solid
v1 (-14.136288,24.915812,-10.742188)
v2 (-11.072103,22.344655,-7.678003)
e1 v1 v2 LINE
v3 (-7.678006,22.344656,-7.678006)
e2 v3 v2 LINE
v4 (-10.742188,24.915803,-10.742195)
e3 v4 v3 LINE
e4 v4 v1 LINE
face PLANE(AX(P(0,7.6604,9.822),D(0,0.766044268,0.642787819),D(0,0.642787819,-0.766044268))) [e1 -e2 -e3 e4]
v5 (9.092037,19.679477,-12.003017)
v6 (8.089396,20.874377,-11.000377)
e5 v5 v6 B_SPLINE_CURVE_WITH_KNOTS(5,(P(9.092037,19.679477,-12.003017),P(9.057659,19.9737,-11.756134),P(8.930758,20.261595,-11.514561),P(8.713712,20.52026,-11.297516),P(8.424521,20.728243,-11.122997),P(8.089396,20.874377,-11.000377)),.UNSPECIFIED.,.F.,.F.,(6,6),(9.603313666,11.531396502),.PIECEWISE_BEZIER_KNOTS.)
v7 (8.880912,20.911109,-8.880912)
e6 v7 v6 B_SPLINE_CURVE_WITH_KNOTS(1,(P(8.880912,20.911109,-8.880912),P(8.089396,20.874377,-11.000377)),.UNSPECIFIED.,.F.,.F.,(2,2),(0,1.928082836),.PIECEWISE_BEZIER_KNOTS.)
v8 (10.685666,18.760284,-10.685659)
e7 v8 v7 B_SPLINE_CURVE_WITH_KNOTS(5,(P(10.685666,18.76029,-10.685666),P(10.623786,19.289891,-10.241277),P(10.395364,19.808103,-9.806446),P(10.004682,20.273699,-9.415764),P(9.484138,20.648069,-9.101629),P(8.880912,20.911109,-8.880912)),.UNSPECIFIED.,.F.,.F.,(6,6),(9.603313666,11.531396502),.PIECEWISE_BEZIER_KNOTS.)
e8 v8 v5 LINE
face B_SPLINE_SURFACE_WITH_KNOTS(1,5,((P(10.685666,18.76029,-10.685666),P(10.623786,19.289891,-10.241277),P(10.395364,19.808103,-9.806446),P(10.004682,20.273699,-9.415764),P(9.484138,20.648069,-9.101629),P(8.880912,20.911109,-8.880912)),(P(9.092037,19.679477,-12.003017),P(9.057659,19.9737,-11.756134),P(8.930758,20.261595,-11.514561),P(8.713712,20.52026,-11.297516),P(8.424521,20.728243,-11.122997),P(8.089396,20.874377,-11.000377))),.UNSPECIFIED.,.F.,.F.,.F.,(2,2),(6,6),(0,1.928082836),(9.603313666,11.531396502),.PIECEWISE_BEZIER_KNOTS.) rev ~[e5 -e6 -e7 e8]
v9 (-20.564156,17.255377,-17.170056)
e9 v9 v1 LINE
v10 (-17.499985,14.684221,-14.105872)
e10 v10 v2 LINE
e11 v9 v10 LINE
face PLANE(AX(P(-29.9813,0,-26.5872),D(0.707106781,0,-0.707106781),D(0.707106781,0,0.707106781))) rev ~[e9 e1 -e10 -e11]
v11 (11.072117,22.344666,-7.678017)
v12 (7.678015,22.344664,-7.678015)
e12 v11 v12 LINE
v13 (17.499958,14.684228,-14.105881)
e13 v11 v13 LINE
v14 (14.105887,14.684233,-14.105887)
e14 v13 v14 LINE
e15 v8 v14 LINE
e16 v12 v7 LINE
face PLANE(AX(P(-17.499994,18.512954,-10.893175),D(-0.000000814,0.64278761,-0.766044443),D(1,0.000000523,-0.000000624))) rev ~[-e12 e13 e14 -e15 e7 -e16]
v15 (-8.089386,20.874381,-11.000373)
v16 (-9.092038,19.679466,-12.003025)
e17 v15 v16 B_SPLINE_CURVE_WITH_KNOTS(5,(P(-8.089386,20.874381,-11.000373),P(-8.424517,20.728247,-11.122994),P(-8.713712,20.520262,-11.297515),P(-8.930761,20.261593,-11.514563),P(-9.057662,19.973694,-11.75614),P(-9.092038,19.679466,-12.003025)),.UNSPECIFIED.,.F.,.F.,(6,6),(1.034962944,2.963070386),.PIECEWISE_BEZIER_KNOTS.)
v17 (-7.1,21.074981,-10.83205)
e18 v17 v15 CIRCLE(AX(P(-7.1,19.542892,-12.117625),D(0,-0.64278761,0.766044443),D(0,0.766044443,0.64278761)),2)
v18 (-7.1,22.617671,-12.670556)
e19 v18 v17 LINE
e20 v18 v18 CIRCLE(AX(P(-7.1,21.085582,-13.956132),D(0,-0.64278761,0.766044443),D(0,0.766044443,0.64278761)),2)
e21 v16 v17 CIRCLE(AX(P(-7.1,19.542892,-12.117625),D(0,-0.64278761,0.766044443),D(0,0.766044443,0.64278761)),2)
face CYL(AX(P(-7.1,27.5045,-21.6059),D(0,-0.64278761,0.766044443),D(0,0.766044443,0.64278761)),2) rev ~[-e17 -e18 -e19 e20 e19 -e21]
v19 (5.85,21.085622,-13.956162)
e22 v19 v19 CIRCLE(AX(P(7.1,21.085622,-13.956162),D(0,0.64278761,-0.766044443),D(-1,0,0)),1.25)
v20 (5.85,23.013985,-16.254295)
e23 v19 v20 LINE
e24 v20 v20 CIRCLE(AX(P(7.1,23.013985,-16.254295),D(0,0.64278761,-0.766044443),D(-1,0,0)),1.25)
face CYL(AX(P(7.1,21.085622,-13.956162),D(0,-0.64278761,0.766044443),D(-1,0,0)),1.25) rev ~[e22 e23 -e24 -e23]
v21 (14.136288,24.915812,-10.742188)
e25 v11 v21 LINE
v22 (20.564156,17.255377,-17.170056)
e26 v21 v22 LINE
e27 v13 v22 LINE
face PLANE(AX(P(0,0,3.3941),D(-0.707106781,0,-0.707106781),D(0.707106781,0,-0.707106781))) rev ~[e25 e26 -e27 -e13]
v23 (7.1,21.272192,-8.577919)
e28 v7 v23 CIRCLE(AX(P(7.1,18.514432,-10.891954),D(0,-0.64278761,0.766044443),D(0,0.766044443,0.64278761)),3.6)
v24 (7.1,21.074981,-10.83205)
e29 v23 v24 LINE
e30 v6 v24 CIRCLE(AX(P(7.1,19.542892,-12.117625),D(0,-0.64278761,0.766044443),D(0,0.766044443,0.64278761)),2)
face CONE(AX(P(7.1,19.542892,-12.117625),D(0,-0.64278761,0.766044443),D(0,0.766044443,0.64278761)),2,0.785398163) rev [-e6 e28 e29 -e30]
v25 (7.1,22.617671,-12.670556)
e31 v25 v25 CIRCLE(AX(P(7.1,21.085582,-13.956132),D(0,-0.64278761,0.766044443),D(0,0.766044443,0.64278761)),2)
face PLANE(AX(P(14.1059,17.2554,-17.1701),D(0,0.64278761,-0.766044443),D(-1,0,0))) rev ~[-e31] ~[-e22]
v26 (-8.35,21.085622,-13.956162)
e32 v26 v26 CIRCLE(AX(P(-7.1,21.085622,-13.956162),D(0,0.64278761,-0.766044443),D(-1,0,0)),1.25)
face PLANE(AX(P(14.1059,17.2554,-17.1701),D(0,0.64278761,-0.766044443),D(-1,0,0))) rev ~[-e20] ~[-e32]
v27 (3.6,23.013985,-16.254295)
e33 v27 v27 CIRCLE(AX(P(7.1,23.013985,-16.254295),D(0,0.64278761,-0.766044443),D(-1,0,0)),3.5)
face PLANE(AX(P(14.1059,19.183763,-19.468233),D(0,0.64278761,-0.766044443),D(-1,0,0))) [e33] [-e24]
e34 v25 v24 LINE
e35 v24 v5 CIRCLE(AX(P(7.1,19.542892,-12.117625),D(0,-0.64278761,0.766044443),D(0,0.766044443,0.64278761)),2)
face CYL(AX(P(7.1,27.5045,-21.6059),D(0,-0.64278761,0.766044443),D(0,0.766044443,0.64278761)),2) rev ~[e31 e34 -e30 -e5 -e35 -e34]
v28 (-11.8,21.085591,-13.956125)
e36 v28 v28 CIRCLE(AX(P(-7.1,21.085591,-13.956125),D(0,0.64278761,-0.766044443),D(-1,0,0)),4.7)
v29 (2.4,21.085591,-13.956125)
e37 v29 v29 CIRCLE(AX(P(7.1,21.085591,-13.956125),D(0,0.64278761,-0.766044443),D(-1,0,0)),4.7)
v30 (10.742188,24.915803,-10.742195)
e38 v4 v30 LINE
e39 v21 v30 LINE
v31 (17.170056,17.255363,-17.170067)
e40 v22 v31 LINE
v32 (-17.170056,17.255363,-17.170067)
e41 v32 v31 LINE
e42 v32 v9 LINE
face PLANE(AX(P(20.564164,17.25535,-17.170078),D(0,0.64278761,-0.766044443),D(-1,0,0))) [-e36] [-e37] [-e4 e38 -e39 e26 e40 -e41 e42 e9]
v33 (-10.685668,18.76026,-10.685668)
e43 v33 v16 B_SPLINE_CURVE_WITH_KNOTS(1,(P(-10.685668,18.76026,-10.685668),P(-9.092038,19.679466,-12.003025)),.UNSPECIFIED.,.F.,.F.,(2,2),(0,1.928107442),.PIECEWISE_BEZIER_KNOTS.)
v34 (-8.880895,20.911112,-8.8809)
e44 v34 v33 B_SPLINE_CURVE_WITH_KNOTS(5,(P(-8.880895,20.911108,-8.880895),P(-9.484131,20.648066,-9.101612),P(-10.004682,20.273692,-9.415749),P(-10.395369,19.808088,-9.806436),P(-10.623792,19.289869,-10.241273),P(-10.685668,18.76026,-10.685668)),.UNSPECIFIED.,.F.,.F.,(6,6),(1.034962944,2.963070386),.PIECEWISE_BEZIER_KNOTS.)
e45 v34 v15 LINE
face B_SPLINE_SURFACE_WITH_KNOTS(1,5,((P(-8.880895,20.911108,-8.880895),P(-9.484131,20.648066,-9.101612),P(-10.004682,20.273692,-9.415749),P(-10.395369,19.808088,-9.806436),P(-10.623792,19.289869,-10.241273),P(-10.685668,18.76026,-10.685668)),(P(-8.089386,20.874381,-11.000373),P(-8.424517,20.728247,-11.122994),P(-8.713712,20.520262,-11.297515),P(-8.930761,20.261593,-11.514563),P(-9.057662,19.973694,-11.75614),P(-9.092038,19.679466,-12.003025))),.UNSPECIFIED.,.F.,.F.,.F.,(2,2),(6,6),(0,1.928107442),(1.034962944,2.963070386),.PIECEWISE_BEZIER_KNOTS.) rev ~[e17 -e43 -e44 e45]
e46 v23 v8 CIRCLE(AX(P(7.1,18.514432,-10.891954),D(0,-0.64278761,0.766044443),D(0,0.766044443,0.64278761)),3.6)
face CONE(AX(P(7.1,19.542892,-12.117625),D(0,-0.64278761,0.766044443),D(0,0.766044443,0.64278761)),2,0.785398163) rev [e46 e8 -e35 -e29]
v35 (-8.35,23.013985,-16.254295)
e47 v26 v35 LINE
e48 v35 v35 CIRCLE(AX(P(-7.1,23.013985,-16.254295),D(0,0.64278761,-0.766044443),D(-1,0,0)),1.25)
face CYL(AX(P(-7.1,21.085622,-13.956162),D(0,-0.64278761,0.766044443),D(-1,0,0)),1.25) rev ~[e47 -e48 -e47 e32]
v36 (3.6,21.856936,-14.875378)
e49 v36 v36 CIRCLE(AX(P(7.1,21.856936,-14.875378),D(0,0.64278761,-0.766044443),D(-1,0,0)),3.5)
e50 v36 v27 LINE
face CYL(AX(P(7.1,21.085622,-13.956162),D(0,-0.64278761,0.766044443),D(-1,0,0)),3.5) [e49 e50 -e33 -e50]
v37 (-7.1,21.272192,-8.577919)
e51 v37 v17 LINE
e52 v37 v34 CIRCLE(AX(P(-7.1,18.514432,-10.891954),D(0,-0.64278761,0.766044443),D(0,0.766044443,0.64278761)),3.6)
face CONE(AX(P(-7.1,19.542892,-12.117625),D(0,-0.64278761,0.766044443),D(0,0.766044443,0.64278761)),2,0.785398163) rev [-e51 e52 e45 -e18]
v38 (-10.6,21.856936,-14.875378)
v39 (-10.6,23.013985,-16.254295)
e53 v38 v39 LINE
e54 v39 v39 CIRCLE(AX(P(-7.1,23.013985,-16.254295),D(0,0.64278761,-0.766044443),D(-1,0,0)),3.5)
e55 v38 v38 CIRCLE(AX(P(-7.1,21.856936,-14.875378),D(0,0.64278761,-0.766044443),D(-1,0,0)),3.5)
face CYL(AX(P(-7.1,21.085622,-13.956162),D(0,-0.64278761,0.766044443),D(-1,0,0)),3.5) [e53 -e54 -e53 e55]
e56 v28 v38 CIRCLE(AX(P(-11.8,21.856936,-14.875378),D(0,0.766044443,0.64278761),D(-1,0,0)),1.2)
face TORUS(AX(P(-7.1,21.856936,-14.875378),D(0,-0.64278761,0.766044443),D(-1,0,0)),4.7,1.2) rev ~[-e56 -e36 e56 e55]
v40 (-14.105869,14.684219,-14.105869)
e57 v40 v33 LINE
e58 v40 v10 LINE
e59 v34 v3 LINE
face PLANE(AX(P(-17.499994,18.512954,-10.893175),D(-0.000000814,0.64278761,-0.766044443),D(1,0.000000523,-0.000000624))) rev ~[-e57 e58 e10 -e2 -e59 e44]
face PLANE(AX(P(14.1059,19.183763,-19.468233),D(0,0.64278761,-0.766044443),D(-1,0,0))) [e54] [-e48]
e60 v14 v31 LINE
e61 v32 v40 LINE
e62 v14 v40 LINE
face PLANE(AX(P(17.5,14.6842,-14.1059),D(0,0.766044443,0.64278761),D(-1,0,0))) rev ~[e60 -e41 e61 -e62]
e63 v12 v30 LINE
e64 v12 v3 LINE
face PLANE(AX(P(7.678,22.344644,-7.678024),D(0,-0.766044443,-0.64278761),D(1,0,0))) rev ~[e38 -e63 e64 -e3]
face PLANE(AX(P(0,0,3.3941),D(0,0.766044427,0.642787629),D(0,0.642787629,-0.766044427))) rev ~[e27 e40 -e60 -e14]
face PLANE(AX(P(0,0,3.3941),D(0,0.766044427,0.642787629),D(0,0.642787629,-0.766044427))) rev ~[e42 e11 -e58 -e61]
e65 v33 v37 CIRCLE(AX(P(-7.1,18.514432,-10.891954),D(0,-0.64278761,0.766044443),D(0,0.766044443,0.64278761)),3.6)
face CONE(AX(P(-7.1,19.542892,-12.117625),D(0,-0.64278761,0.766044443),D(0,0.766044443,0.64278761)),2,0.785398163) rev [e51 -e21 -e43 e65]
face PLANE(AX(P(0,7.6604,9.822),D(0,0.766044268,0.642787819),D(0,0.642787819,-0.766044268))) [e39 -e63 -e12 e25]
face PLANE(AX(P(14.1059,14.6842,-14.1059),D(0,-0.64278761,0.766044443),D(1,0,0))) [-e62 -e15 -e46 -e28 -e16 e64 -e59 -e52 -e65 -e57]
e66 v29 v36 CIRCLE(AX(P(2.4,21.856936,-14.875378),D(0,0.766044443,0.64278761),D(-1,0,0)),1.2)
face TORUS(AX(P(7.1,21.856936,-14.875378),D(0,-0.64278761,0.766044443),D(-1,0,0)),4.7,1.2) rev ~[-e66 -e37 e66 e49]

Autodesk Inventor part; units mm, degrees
ref_plane "YZ Plane" through (0, 0, 0) normal (1, 0, 0) x (0, 1, 0)
ref_plane "XZ Plane" through (0, 0, 0) normal (0, 1, 0) x (-1, 0, 0)
sketch "スケッチ1" plane through (0, 0, 0) normal (0, 1, 0) x (-1, 0, 0)
  line L0 (28.2843, -28.2843) -> (0, 0)
  line L1 (0, 0) -> (-28.2843, -28.2843)
  line L2 (29.9813, -26.5872) -> (0, 3.3941)
  line L3 (0, 3.3941) -> (-29.9813, -26.5872)
  line L4 (28.2843, -28.2843) -> (29.9813, -26.5872)
  line L5 (-28.2843, -28.2843) -> (-29.9813, -26.5872)
  dimension "d0" = 40
  dimension "d1" = 2.4
extrude "押し出し1" add sketch "スケッチ1" along normal blind 50
sketch "スケッチ2" plane through (0, 0, 0) normal (1, 0, 0) x (0, 1, 0)
  line L0 (0, 3.3941) -> (31.9749, -34.7121)
  line L1 (0, 0) -> (0, -28.2843) projected
  line L2 (7.6604, 9.822) -> (39.6354, -28.2843)
  line L3 (0, 3.3941) -> (7.6604, 9.822)
  line L4 (39.6354, -28.2843) -> (31.9749, -34.7121)
  line L5 (0, -28.2843) -> (50, -28.2843) projected
  point P0 (26.5813, -28.2843)
  dimension "d4" = 40
  dimension "d5" = 10
extrude "押し出し2" cut sketch "スケッチ2" along normal mid plane 50 contours L3 L2 L5 L0 keep common part
ref_plane "作業平面1" through (0, 9.2239, 0.1802) normal (0, 0.7660444, 0.6427876) x (0.7938448, -0.3908923, 0.4658473)
sketch "スケッチ4" plane through (0, 9.2239, 0.1802) normal (0, 0.7660444, 0.6427876) x (0.7938448, -0.3908923, 0.4658473)
  line L0 (-37.1409, 7.3737) -> (2.5514, 37.7797)
  line L1 (-34.5895, 4.0431) -> (-39.6922, 10.7043) projected
  line L2 (0, 41.1103) -> (5.1027, 34.4491) projected
  point P0 (3.5216, -4.5971)
ref_plane "作業平面2" through (-25, 27.5045, -21.6059) normal (0, -0.6427876, 0.7660444) x (1, 0, 0)
sketch "スケッチ6" plane through (0, 9.2239, 0.1802) normal (0, 0.7660444, 0.6427876) x (0.7938448, -0.3908923, 0.4658473)
  line L0 (5.1027, -6.6611) -> (-34.5895, 4.0431) projected
  line L1 (5.1027, 34.4491) -> (5.1027, -6.6611) projected
  line L2 (5.1027, -6.6611) -> (-22.6818, 0.8318)
  line L3 (-22.6818, 0.8318) -> (5.1027, 22.116)
  line L4 (5.1027, 22.116) -> (5.1027, -6.6611)
  point P0 (3.5216, -4.5971)
  point P1 (5.1027, 22.116)
  dimension "d17" = 35
extrude "押し出し3" cut sketch "スケッチ6" along normal mid plane 50
sketch "スケッチ7" plane through (14.1059, 14.6842, -14.1059) normal (0, -0.6427876, 0.7660444) x (1, 0, 0)
  line L0 (3.3941, 0) -> (0, 0) projected
  line L1 (-3.0338, 10) -> (3.3941, 0) projected
  line L2 (-6.4279, 10) -> (-3.0338, 10) projected
  line L3 (-31.6059, 0) -> (-25.178, 10) projected
  line L4 (-28.2118, 0) -> (-31.6059, 0) projected
  line L5 (-21.7839, 10) -> (-28.2118, 0) projected
  line L6 (-25.178, 10) -> (-21.7839, 10) projected
  line L7 (-21.7839, 10) -> (-6.4279, 10)
  line L8 (-28.2118, 0) -> (0, 0)
  point P0 (-14.1059, -2.1817)
extrude "押し出し4" add sketch "スケッチ7" against normal blind 4
sketch "スケッチ10" plane through (-17.5, 14.6842, -14.1059) normal (0, -0.7660444, -0.6427876) x (1, 0, 0)
  line L0 (34.6701, -4) -> (42.5, -14.2213) projected
  line L1 (42.5, -9.7906) -> (42.5, -14.2213) projected
  line L2 (42.5, -9.7906) -> (35, 0) projected
  line L3 (0, 0) -> (-7.5, -9.7906) projected
  line L4 (-7.5, -14.2213) -> (-7.5, -9.7906) projected
  line L5 (-7.5, -14.2213) -> (0.3299, -4) projected
  line L6 (34.6701, -4) -> (0.3299, -4) projected
  line L7 (54.0058, -4) -> (-14.4099, -4)
  line L8 (-14.4099, -4) -> (-14.4099, -41.5974)
  line L9 (-14.4099, -41.5974) -> (54.0058, -41.5974)
  line L10 (54.0058, -41.5974) -> (54.0058, -4)
  point P0 (17.5, 20.2446)
  point P1 (-3.0642, -4)
  point P2 (38.0642, -4)
  point P3 (34.6701, -4)
extrude "押し出し6" cut sketch "スケッチ10" along normal through all both and the other way through all
sketch "スケッチ5" plane through (-25, 27.5045, -21.6059) normal (0, -0.6427876, 0.7660444) x (1, 0, 0)
  line L0 (0, 0) -> (50, 0) projected
  line L1 (17.9, 0) -> (32.1, 0)
  point P0 (25, -7.1817)
  point P1 (25, 0)
  dimension "d9" = 14.2
hole "穴1" at (-7.1, 27.5045, -21.6059) at (7.1, 27.5045, -21.6059) direction (0, -0.6427876, 0.7660444) diameter 4 end through all
sketch "スケッチ9" plane through (14.1059, 17.2554, -17.1701) normal (0, 0.6427876, -0.7660444) x (-1, 0, 0)
  circle A0 centre (21.2059, 5) radius 2 construction
  circle A1 centre (7.0059, 5) radius 2 construction
  circle A2 centre (7.0059, 5) radius 1.25
  circle A3 centre (7.0059, 5) radius 3.5
  circle A4 centre (21.2059, 5) radius 1.25
  circle A5 centre (21.2059, 5) radius 3.5
  point P0 (14.1059, -2.1817)
  dimension "d22" = 2.5
  dimension "d23" = 1.5
extrude "押し出し5" add sketch "スケッチ9" along normal blind 3
fillet "フィレット1" radius 1.2 2 edges at (-3.6, 21.0856, -13.9561) (10.6, 21.0856, -13.9561)
chamfer "面取り1" distance 1.6 angle 45 2 edges at (7.1, 16.9824, -12.1775) (-7.1, 16.9824, -12.1775)
properties part number "om_Drop_bumper"
